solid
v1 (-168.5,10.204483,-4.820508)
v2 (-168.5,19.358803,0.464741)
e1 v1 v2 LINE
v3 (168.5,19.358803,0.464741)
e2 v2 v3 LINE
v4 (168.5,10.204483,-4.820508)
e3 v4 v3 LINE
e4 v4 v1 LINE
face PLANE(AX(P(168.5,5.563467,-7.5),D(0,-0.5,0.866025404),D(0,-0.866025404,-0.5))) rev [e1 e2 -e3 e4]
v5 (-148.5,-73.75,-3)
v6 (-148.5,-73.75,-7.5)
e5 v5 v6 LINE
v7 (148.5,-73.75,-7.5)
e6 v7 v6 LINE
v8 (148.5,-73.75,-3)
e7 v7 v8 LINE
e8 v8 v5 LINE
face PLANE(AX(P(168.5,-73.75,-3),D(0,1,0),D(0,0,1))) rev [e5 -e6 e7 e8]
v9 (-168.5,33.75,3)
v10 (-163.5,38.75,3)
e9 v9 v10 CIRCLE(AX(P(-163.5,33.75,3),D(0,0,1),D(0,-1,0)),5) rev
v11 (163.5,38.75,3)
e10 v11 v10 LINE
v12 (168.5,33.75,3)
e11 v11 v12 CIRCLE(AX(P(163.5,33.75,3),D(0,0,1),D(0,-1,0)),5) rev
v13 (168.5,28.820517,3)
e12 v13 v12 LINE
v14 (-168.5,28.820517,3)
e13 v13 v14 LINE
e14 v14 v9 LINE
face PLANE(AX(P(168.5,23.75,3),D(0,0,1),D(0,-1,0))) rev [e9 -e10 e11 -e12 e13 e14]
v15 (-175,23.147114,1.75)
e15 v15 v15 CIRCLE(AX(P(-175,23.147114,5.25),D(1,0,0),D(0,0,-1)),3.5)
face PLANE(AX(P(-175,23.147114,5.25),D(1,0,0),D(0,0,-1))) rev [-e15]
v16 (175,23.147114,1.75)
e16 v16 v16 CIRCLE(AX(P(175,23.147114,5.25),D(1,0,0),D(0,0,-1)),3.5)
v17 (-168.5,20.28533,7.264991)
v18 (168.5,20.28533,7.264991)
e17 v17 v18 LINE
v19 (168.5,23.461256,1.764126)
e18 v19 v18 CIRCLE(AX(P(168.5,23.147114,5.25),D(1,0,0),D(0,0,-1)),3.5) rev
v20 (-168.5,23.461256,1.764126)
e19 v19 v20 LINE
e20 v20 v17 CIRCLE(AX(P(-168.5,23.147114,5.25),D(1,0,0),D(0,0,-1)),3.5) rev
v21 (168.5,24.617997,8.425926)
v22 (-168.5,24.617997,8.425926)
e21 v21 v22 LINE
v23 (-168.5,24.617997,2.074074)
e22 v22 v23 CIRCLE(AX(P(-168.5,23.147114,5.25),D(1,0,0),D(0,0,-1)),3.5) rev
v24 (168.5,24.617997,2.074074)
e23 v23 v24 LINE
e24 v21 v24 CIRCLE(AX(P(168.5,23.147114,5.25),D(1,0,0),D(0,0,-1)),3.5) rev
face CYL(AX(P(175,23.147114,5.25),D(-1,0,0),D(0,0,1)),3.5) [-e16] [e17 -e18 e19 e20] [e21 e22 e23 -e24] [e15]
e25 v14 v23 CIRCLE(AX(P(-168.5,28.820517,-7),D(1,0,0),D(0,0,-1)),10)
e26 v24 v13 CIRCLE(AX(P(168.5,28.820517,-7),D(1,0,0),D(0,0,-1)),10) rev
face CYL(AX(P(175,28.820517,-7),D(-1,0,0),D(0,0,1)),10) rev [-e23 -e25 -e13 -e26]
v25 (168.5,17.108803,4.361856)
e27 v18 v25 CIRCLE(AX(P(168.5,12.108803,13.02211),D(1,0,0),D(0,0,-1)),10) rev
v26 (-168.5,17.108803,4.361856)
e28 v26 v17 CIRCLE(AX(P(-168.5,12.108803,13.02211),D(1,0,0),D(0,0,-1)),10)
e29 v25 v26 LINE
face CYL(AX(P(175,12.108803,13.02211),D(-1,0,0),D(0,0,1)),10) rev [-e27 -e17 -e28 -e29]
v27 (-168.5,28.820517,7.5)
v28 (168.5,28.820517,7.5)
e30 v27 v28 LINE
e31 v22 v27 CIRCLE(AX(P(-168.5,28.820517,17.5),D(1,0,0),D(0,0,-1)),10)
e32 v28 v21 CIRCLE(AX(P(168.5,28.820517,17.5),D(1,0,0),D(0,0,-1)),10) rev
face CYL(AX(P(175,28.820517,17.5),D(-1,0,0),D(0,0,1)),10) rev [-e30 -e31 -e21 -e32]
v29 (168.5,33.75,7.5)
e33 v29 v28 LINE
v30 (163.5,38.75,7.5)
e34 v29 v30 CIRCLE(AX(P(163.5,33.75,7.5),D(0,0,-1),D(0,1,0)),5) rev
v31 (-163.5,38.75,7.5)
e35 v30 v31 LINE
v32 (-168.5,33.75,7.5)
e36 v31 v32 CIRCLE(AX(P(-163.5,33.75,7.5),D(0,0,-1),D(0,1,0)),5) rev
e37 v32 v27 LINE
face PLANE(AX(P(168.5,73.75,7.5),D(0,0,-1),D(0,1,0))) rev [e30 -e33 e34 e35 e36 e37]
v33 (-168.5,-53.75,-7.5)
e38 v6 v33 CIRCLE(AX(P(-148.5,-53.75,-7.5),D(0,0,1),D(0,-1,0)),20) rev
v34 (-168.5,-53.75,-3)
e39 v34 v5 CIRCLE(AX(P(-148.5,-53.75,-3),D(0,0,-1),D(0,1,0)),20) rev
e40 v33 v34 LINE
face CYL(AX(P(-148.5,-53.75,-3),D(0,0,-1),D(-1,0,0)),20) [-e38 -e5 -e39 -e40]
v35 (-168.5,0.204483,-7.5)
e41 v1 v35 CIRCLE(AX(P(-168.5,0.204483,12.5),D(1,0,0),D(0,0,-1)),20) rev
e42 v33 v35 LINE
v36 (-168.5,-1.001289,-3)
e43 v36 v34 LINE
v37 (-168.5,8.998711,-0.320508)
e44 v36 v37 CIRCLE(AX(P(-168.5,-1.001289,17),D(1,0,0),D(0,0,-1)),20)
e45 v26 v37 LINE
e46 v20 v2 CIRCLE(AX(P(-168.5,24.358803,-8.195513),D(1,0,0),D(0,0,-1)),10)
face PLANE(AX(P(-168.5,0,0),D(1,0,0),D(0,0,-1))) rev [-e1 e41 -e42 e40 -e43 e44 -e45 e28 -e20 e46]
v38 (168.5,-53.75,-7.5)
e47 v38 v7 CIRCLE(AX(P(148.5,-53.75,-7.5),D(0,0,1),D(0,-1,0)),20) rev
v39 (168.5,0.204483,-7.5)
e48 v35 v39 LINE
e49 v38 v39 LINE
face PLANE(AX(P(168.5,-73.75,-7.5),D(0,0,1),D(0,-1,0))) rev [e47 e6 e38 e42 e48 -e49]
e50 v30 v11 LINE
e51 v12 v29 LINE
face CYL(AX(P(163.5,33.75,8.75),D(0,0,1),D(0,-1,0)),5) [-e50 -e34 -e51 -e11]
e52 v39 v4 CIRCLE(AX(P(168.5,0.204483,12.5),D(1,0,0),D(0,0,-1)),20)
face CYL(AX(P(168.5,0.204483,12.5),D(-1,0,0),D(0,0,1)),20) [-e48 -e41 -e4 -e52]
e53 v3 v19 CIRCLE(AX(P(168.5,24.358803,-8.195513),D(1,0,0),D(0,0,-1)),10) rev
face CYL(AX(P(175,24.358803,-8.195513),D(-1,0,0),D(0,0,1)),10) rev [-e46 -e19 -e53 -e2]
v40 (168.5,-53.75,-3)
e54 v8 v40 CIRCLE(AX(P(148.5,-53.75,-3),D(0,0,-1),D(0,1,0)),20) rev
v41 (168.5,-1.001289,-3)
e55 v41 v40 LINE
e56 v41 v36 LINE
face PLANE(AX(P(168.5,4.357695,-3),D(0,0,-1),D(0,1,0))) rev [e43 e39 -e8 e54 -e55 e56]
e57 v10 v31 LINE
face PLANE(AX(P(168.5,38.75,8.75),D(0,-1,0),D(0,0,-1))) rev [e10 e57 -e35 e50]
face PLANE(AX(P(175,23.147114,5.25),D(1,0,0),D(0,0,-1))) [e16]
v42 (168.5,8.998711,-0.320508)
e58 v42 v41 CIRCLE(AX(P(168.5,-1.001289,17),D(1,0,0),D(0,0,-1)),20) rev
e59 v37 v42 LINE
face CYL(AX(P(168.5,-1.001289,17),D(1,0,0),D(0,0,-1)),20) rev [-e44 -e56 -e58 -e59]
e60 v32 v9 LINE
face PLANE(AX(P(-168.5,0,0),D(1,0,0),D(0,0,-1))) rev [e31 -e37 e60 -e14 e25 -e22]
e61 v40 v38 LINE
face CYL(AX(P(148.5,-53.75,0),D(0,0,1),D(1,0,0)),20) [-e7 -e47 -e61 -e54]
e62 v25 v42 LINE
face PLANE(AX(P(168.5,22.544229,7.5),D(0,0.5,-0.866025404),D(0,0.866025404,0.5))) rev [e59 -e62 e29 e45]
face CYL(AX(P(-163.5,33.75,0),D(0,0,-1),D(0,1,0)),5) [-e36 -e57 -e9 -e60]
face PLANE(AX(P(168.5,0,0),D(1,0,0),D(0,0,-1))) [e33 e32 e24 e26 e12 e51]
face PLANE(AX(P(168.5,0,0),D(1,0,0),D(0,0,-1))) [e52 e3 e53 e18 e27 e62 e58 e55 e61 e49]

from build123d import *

# Parameters (mm, degrees)
BOSS_EXTRUDE1_DEPTH = 168.5
SKETCH2_R           = 3.5
BOSS_EXTRUDE2_DEPTH = 175
FILLET1_R           = 20
SKETCH3_W           = 337
SKETCH3_H           = 35
CUT_EXTRUDE1_DEPTH  = 191.195458673
FILLET2_R           = 10
FILLET3_R           = 5


with BuildPart() as part:
    # Sketch1 → Boss-Extrude1 (new, symmetric)
    with BuildSketch(Plane(origin=(0, 0, 0), x_dir=(0, 0, -1), z_dir=(1, 0, 0))):
        Polygon((-7.5, 73.75), (-7.5, 22.544228634), (3, 4.357695155), (3, -73.75), (7.5, -73.75), (7.5, 5.563466521), (-3, 23.75), (-3, 73.75), align=None)
    extrude(amount=BOSS_EXTRUDE1_DEPTH, both=True)

    # Sketch2 → Boss-Extrude2 (add, symmetric)
    with BuildSketch(Plane(origin=(0, 0, 0), x_dir=(0, 0, -1), z_dir=(1, 0, 0))):
        with Locations((-5.25, 23.147114317)):
            Circle(SKETCH2_R)
    extrude(amount=BOSS_EXTRUDE2_DEPTH, both=True)

    # Fillet1
    fillet1_edges = [part.edges().sort_by_distance(p)[0] for p in [
        (-168.5, 73.75, 5.25),
        (0, 5.563466521, -7.5),
        (0, 4.357695155, -3),
        (168.5, -73.75, -5.25),
        (168.5, 73.75, 5.25),
        (-168.5, -73.75, -5.25),
    ]]
    fillet(fillet1_edges, radius=FILLET1_R)

    # Sketch3 → Cut-Extrude1 (cut, through all)
    with BuildSketch(Plane(origin=(0, 0, 3), x_dir=(-1, 0, 0), z_dir=(0, 0, -1))):
        with Locations((0, 56.25)):
            Rectangle(SKETCH3_W, SKETCH3_H)
    extrude(amount=-CUT_EXTRUDE1_DEPTH, mode=Mode.SUBTRACT)

    # Fillet2
    # the kernel refuses this fillet: 10 mm, written as the material it adds along each edge
    with BuildSketch(Plane(origin=(-168.5, 21.950342364, 1.96096718), x_dir=(0, 0.9916201681580873, -0.12918762364145653), z_dir=(1, 0, 0))) as fillet2_piece_1:
        with BuildLine():
            CenterArc((3.700369944, -9.760226866), FILLET2_R, 102.572148387, 24.85050234)
            Line((-2.376528536, -1.818482419), (0, 0))
            ThreePointArc((0, 0), (0.761840871, -0.083920597), (1.523681742, 0))
        make_face()
    extrude(amount=337)
    with BuildSketch(Plane(origin=(-168.5, 19.700342364, 5.858081497), x_dir=(0, 0.38393032015099443, 0.9233620683506307), z_dir=(1, 0, 0)), Plane(origin=(-168.5, 25.828065641, 3), x_dir=(0, -0.7941744447091721, -0.6076898480070884), z_dir=(1, 0, 0))) as fillet2_piece_2:
        with BuildLine():
            CenterArc((3.700369944, 9.760226866), FILLET2_R, 232.577349272, 24.85050234)
            Line((-2.376528536, 1.818482419), (0, 0))
            ThreePointArc((0, 0), (0.761840871, 0.083920597), (1.523681742, 0))
        make_face()
    extrude(amount=337)
    with BuildSketch(Plane(origin=(-168.5, 25.828065641, 7.5), x_dir=(0, 1, 0), z_dir=(1, 0, 0))) as fillet2_piece_3:
        with BuildLine():
            CenterArc((2.992451535, 10), FILLET2_R, 245.14949766, 24.85050234)
            ThreePointArc((-1.210069101, 0.925925926), (-0.554036856, 0.529610556), (0, 0))
            Line((0, 0), (2.992451535, 0))
        make_face()
    extrude(amount=337)

    # Fillet3
    fillet3_edges = [part.edges().sort_by_distance(p)[0] for p in [
        (-168.5, 38.75, 5.25),
        (168.5, 38.75, 5.25),
    ]]
    fillet(fillet3_edges, radius=FILLET3_R)


solid = part.part
